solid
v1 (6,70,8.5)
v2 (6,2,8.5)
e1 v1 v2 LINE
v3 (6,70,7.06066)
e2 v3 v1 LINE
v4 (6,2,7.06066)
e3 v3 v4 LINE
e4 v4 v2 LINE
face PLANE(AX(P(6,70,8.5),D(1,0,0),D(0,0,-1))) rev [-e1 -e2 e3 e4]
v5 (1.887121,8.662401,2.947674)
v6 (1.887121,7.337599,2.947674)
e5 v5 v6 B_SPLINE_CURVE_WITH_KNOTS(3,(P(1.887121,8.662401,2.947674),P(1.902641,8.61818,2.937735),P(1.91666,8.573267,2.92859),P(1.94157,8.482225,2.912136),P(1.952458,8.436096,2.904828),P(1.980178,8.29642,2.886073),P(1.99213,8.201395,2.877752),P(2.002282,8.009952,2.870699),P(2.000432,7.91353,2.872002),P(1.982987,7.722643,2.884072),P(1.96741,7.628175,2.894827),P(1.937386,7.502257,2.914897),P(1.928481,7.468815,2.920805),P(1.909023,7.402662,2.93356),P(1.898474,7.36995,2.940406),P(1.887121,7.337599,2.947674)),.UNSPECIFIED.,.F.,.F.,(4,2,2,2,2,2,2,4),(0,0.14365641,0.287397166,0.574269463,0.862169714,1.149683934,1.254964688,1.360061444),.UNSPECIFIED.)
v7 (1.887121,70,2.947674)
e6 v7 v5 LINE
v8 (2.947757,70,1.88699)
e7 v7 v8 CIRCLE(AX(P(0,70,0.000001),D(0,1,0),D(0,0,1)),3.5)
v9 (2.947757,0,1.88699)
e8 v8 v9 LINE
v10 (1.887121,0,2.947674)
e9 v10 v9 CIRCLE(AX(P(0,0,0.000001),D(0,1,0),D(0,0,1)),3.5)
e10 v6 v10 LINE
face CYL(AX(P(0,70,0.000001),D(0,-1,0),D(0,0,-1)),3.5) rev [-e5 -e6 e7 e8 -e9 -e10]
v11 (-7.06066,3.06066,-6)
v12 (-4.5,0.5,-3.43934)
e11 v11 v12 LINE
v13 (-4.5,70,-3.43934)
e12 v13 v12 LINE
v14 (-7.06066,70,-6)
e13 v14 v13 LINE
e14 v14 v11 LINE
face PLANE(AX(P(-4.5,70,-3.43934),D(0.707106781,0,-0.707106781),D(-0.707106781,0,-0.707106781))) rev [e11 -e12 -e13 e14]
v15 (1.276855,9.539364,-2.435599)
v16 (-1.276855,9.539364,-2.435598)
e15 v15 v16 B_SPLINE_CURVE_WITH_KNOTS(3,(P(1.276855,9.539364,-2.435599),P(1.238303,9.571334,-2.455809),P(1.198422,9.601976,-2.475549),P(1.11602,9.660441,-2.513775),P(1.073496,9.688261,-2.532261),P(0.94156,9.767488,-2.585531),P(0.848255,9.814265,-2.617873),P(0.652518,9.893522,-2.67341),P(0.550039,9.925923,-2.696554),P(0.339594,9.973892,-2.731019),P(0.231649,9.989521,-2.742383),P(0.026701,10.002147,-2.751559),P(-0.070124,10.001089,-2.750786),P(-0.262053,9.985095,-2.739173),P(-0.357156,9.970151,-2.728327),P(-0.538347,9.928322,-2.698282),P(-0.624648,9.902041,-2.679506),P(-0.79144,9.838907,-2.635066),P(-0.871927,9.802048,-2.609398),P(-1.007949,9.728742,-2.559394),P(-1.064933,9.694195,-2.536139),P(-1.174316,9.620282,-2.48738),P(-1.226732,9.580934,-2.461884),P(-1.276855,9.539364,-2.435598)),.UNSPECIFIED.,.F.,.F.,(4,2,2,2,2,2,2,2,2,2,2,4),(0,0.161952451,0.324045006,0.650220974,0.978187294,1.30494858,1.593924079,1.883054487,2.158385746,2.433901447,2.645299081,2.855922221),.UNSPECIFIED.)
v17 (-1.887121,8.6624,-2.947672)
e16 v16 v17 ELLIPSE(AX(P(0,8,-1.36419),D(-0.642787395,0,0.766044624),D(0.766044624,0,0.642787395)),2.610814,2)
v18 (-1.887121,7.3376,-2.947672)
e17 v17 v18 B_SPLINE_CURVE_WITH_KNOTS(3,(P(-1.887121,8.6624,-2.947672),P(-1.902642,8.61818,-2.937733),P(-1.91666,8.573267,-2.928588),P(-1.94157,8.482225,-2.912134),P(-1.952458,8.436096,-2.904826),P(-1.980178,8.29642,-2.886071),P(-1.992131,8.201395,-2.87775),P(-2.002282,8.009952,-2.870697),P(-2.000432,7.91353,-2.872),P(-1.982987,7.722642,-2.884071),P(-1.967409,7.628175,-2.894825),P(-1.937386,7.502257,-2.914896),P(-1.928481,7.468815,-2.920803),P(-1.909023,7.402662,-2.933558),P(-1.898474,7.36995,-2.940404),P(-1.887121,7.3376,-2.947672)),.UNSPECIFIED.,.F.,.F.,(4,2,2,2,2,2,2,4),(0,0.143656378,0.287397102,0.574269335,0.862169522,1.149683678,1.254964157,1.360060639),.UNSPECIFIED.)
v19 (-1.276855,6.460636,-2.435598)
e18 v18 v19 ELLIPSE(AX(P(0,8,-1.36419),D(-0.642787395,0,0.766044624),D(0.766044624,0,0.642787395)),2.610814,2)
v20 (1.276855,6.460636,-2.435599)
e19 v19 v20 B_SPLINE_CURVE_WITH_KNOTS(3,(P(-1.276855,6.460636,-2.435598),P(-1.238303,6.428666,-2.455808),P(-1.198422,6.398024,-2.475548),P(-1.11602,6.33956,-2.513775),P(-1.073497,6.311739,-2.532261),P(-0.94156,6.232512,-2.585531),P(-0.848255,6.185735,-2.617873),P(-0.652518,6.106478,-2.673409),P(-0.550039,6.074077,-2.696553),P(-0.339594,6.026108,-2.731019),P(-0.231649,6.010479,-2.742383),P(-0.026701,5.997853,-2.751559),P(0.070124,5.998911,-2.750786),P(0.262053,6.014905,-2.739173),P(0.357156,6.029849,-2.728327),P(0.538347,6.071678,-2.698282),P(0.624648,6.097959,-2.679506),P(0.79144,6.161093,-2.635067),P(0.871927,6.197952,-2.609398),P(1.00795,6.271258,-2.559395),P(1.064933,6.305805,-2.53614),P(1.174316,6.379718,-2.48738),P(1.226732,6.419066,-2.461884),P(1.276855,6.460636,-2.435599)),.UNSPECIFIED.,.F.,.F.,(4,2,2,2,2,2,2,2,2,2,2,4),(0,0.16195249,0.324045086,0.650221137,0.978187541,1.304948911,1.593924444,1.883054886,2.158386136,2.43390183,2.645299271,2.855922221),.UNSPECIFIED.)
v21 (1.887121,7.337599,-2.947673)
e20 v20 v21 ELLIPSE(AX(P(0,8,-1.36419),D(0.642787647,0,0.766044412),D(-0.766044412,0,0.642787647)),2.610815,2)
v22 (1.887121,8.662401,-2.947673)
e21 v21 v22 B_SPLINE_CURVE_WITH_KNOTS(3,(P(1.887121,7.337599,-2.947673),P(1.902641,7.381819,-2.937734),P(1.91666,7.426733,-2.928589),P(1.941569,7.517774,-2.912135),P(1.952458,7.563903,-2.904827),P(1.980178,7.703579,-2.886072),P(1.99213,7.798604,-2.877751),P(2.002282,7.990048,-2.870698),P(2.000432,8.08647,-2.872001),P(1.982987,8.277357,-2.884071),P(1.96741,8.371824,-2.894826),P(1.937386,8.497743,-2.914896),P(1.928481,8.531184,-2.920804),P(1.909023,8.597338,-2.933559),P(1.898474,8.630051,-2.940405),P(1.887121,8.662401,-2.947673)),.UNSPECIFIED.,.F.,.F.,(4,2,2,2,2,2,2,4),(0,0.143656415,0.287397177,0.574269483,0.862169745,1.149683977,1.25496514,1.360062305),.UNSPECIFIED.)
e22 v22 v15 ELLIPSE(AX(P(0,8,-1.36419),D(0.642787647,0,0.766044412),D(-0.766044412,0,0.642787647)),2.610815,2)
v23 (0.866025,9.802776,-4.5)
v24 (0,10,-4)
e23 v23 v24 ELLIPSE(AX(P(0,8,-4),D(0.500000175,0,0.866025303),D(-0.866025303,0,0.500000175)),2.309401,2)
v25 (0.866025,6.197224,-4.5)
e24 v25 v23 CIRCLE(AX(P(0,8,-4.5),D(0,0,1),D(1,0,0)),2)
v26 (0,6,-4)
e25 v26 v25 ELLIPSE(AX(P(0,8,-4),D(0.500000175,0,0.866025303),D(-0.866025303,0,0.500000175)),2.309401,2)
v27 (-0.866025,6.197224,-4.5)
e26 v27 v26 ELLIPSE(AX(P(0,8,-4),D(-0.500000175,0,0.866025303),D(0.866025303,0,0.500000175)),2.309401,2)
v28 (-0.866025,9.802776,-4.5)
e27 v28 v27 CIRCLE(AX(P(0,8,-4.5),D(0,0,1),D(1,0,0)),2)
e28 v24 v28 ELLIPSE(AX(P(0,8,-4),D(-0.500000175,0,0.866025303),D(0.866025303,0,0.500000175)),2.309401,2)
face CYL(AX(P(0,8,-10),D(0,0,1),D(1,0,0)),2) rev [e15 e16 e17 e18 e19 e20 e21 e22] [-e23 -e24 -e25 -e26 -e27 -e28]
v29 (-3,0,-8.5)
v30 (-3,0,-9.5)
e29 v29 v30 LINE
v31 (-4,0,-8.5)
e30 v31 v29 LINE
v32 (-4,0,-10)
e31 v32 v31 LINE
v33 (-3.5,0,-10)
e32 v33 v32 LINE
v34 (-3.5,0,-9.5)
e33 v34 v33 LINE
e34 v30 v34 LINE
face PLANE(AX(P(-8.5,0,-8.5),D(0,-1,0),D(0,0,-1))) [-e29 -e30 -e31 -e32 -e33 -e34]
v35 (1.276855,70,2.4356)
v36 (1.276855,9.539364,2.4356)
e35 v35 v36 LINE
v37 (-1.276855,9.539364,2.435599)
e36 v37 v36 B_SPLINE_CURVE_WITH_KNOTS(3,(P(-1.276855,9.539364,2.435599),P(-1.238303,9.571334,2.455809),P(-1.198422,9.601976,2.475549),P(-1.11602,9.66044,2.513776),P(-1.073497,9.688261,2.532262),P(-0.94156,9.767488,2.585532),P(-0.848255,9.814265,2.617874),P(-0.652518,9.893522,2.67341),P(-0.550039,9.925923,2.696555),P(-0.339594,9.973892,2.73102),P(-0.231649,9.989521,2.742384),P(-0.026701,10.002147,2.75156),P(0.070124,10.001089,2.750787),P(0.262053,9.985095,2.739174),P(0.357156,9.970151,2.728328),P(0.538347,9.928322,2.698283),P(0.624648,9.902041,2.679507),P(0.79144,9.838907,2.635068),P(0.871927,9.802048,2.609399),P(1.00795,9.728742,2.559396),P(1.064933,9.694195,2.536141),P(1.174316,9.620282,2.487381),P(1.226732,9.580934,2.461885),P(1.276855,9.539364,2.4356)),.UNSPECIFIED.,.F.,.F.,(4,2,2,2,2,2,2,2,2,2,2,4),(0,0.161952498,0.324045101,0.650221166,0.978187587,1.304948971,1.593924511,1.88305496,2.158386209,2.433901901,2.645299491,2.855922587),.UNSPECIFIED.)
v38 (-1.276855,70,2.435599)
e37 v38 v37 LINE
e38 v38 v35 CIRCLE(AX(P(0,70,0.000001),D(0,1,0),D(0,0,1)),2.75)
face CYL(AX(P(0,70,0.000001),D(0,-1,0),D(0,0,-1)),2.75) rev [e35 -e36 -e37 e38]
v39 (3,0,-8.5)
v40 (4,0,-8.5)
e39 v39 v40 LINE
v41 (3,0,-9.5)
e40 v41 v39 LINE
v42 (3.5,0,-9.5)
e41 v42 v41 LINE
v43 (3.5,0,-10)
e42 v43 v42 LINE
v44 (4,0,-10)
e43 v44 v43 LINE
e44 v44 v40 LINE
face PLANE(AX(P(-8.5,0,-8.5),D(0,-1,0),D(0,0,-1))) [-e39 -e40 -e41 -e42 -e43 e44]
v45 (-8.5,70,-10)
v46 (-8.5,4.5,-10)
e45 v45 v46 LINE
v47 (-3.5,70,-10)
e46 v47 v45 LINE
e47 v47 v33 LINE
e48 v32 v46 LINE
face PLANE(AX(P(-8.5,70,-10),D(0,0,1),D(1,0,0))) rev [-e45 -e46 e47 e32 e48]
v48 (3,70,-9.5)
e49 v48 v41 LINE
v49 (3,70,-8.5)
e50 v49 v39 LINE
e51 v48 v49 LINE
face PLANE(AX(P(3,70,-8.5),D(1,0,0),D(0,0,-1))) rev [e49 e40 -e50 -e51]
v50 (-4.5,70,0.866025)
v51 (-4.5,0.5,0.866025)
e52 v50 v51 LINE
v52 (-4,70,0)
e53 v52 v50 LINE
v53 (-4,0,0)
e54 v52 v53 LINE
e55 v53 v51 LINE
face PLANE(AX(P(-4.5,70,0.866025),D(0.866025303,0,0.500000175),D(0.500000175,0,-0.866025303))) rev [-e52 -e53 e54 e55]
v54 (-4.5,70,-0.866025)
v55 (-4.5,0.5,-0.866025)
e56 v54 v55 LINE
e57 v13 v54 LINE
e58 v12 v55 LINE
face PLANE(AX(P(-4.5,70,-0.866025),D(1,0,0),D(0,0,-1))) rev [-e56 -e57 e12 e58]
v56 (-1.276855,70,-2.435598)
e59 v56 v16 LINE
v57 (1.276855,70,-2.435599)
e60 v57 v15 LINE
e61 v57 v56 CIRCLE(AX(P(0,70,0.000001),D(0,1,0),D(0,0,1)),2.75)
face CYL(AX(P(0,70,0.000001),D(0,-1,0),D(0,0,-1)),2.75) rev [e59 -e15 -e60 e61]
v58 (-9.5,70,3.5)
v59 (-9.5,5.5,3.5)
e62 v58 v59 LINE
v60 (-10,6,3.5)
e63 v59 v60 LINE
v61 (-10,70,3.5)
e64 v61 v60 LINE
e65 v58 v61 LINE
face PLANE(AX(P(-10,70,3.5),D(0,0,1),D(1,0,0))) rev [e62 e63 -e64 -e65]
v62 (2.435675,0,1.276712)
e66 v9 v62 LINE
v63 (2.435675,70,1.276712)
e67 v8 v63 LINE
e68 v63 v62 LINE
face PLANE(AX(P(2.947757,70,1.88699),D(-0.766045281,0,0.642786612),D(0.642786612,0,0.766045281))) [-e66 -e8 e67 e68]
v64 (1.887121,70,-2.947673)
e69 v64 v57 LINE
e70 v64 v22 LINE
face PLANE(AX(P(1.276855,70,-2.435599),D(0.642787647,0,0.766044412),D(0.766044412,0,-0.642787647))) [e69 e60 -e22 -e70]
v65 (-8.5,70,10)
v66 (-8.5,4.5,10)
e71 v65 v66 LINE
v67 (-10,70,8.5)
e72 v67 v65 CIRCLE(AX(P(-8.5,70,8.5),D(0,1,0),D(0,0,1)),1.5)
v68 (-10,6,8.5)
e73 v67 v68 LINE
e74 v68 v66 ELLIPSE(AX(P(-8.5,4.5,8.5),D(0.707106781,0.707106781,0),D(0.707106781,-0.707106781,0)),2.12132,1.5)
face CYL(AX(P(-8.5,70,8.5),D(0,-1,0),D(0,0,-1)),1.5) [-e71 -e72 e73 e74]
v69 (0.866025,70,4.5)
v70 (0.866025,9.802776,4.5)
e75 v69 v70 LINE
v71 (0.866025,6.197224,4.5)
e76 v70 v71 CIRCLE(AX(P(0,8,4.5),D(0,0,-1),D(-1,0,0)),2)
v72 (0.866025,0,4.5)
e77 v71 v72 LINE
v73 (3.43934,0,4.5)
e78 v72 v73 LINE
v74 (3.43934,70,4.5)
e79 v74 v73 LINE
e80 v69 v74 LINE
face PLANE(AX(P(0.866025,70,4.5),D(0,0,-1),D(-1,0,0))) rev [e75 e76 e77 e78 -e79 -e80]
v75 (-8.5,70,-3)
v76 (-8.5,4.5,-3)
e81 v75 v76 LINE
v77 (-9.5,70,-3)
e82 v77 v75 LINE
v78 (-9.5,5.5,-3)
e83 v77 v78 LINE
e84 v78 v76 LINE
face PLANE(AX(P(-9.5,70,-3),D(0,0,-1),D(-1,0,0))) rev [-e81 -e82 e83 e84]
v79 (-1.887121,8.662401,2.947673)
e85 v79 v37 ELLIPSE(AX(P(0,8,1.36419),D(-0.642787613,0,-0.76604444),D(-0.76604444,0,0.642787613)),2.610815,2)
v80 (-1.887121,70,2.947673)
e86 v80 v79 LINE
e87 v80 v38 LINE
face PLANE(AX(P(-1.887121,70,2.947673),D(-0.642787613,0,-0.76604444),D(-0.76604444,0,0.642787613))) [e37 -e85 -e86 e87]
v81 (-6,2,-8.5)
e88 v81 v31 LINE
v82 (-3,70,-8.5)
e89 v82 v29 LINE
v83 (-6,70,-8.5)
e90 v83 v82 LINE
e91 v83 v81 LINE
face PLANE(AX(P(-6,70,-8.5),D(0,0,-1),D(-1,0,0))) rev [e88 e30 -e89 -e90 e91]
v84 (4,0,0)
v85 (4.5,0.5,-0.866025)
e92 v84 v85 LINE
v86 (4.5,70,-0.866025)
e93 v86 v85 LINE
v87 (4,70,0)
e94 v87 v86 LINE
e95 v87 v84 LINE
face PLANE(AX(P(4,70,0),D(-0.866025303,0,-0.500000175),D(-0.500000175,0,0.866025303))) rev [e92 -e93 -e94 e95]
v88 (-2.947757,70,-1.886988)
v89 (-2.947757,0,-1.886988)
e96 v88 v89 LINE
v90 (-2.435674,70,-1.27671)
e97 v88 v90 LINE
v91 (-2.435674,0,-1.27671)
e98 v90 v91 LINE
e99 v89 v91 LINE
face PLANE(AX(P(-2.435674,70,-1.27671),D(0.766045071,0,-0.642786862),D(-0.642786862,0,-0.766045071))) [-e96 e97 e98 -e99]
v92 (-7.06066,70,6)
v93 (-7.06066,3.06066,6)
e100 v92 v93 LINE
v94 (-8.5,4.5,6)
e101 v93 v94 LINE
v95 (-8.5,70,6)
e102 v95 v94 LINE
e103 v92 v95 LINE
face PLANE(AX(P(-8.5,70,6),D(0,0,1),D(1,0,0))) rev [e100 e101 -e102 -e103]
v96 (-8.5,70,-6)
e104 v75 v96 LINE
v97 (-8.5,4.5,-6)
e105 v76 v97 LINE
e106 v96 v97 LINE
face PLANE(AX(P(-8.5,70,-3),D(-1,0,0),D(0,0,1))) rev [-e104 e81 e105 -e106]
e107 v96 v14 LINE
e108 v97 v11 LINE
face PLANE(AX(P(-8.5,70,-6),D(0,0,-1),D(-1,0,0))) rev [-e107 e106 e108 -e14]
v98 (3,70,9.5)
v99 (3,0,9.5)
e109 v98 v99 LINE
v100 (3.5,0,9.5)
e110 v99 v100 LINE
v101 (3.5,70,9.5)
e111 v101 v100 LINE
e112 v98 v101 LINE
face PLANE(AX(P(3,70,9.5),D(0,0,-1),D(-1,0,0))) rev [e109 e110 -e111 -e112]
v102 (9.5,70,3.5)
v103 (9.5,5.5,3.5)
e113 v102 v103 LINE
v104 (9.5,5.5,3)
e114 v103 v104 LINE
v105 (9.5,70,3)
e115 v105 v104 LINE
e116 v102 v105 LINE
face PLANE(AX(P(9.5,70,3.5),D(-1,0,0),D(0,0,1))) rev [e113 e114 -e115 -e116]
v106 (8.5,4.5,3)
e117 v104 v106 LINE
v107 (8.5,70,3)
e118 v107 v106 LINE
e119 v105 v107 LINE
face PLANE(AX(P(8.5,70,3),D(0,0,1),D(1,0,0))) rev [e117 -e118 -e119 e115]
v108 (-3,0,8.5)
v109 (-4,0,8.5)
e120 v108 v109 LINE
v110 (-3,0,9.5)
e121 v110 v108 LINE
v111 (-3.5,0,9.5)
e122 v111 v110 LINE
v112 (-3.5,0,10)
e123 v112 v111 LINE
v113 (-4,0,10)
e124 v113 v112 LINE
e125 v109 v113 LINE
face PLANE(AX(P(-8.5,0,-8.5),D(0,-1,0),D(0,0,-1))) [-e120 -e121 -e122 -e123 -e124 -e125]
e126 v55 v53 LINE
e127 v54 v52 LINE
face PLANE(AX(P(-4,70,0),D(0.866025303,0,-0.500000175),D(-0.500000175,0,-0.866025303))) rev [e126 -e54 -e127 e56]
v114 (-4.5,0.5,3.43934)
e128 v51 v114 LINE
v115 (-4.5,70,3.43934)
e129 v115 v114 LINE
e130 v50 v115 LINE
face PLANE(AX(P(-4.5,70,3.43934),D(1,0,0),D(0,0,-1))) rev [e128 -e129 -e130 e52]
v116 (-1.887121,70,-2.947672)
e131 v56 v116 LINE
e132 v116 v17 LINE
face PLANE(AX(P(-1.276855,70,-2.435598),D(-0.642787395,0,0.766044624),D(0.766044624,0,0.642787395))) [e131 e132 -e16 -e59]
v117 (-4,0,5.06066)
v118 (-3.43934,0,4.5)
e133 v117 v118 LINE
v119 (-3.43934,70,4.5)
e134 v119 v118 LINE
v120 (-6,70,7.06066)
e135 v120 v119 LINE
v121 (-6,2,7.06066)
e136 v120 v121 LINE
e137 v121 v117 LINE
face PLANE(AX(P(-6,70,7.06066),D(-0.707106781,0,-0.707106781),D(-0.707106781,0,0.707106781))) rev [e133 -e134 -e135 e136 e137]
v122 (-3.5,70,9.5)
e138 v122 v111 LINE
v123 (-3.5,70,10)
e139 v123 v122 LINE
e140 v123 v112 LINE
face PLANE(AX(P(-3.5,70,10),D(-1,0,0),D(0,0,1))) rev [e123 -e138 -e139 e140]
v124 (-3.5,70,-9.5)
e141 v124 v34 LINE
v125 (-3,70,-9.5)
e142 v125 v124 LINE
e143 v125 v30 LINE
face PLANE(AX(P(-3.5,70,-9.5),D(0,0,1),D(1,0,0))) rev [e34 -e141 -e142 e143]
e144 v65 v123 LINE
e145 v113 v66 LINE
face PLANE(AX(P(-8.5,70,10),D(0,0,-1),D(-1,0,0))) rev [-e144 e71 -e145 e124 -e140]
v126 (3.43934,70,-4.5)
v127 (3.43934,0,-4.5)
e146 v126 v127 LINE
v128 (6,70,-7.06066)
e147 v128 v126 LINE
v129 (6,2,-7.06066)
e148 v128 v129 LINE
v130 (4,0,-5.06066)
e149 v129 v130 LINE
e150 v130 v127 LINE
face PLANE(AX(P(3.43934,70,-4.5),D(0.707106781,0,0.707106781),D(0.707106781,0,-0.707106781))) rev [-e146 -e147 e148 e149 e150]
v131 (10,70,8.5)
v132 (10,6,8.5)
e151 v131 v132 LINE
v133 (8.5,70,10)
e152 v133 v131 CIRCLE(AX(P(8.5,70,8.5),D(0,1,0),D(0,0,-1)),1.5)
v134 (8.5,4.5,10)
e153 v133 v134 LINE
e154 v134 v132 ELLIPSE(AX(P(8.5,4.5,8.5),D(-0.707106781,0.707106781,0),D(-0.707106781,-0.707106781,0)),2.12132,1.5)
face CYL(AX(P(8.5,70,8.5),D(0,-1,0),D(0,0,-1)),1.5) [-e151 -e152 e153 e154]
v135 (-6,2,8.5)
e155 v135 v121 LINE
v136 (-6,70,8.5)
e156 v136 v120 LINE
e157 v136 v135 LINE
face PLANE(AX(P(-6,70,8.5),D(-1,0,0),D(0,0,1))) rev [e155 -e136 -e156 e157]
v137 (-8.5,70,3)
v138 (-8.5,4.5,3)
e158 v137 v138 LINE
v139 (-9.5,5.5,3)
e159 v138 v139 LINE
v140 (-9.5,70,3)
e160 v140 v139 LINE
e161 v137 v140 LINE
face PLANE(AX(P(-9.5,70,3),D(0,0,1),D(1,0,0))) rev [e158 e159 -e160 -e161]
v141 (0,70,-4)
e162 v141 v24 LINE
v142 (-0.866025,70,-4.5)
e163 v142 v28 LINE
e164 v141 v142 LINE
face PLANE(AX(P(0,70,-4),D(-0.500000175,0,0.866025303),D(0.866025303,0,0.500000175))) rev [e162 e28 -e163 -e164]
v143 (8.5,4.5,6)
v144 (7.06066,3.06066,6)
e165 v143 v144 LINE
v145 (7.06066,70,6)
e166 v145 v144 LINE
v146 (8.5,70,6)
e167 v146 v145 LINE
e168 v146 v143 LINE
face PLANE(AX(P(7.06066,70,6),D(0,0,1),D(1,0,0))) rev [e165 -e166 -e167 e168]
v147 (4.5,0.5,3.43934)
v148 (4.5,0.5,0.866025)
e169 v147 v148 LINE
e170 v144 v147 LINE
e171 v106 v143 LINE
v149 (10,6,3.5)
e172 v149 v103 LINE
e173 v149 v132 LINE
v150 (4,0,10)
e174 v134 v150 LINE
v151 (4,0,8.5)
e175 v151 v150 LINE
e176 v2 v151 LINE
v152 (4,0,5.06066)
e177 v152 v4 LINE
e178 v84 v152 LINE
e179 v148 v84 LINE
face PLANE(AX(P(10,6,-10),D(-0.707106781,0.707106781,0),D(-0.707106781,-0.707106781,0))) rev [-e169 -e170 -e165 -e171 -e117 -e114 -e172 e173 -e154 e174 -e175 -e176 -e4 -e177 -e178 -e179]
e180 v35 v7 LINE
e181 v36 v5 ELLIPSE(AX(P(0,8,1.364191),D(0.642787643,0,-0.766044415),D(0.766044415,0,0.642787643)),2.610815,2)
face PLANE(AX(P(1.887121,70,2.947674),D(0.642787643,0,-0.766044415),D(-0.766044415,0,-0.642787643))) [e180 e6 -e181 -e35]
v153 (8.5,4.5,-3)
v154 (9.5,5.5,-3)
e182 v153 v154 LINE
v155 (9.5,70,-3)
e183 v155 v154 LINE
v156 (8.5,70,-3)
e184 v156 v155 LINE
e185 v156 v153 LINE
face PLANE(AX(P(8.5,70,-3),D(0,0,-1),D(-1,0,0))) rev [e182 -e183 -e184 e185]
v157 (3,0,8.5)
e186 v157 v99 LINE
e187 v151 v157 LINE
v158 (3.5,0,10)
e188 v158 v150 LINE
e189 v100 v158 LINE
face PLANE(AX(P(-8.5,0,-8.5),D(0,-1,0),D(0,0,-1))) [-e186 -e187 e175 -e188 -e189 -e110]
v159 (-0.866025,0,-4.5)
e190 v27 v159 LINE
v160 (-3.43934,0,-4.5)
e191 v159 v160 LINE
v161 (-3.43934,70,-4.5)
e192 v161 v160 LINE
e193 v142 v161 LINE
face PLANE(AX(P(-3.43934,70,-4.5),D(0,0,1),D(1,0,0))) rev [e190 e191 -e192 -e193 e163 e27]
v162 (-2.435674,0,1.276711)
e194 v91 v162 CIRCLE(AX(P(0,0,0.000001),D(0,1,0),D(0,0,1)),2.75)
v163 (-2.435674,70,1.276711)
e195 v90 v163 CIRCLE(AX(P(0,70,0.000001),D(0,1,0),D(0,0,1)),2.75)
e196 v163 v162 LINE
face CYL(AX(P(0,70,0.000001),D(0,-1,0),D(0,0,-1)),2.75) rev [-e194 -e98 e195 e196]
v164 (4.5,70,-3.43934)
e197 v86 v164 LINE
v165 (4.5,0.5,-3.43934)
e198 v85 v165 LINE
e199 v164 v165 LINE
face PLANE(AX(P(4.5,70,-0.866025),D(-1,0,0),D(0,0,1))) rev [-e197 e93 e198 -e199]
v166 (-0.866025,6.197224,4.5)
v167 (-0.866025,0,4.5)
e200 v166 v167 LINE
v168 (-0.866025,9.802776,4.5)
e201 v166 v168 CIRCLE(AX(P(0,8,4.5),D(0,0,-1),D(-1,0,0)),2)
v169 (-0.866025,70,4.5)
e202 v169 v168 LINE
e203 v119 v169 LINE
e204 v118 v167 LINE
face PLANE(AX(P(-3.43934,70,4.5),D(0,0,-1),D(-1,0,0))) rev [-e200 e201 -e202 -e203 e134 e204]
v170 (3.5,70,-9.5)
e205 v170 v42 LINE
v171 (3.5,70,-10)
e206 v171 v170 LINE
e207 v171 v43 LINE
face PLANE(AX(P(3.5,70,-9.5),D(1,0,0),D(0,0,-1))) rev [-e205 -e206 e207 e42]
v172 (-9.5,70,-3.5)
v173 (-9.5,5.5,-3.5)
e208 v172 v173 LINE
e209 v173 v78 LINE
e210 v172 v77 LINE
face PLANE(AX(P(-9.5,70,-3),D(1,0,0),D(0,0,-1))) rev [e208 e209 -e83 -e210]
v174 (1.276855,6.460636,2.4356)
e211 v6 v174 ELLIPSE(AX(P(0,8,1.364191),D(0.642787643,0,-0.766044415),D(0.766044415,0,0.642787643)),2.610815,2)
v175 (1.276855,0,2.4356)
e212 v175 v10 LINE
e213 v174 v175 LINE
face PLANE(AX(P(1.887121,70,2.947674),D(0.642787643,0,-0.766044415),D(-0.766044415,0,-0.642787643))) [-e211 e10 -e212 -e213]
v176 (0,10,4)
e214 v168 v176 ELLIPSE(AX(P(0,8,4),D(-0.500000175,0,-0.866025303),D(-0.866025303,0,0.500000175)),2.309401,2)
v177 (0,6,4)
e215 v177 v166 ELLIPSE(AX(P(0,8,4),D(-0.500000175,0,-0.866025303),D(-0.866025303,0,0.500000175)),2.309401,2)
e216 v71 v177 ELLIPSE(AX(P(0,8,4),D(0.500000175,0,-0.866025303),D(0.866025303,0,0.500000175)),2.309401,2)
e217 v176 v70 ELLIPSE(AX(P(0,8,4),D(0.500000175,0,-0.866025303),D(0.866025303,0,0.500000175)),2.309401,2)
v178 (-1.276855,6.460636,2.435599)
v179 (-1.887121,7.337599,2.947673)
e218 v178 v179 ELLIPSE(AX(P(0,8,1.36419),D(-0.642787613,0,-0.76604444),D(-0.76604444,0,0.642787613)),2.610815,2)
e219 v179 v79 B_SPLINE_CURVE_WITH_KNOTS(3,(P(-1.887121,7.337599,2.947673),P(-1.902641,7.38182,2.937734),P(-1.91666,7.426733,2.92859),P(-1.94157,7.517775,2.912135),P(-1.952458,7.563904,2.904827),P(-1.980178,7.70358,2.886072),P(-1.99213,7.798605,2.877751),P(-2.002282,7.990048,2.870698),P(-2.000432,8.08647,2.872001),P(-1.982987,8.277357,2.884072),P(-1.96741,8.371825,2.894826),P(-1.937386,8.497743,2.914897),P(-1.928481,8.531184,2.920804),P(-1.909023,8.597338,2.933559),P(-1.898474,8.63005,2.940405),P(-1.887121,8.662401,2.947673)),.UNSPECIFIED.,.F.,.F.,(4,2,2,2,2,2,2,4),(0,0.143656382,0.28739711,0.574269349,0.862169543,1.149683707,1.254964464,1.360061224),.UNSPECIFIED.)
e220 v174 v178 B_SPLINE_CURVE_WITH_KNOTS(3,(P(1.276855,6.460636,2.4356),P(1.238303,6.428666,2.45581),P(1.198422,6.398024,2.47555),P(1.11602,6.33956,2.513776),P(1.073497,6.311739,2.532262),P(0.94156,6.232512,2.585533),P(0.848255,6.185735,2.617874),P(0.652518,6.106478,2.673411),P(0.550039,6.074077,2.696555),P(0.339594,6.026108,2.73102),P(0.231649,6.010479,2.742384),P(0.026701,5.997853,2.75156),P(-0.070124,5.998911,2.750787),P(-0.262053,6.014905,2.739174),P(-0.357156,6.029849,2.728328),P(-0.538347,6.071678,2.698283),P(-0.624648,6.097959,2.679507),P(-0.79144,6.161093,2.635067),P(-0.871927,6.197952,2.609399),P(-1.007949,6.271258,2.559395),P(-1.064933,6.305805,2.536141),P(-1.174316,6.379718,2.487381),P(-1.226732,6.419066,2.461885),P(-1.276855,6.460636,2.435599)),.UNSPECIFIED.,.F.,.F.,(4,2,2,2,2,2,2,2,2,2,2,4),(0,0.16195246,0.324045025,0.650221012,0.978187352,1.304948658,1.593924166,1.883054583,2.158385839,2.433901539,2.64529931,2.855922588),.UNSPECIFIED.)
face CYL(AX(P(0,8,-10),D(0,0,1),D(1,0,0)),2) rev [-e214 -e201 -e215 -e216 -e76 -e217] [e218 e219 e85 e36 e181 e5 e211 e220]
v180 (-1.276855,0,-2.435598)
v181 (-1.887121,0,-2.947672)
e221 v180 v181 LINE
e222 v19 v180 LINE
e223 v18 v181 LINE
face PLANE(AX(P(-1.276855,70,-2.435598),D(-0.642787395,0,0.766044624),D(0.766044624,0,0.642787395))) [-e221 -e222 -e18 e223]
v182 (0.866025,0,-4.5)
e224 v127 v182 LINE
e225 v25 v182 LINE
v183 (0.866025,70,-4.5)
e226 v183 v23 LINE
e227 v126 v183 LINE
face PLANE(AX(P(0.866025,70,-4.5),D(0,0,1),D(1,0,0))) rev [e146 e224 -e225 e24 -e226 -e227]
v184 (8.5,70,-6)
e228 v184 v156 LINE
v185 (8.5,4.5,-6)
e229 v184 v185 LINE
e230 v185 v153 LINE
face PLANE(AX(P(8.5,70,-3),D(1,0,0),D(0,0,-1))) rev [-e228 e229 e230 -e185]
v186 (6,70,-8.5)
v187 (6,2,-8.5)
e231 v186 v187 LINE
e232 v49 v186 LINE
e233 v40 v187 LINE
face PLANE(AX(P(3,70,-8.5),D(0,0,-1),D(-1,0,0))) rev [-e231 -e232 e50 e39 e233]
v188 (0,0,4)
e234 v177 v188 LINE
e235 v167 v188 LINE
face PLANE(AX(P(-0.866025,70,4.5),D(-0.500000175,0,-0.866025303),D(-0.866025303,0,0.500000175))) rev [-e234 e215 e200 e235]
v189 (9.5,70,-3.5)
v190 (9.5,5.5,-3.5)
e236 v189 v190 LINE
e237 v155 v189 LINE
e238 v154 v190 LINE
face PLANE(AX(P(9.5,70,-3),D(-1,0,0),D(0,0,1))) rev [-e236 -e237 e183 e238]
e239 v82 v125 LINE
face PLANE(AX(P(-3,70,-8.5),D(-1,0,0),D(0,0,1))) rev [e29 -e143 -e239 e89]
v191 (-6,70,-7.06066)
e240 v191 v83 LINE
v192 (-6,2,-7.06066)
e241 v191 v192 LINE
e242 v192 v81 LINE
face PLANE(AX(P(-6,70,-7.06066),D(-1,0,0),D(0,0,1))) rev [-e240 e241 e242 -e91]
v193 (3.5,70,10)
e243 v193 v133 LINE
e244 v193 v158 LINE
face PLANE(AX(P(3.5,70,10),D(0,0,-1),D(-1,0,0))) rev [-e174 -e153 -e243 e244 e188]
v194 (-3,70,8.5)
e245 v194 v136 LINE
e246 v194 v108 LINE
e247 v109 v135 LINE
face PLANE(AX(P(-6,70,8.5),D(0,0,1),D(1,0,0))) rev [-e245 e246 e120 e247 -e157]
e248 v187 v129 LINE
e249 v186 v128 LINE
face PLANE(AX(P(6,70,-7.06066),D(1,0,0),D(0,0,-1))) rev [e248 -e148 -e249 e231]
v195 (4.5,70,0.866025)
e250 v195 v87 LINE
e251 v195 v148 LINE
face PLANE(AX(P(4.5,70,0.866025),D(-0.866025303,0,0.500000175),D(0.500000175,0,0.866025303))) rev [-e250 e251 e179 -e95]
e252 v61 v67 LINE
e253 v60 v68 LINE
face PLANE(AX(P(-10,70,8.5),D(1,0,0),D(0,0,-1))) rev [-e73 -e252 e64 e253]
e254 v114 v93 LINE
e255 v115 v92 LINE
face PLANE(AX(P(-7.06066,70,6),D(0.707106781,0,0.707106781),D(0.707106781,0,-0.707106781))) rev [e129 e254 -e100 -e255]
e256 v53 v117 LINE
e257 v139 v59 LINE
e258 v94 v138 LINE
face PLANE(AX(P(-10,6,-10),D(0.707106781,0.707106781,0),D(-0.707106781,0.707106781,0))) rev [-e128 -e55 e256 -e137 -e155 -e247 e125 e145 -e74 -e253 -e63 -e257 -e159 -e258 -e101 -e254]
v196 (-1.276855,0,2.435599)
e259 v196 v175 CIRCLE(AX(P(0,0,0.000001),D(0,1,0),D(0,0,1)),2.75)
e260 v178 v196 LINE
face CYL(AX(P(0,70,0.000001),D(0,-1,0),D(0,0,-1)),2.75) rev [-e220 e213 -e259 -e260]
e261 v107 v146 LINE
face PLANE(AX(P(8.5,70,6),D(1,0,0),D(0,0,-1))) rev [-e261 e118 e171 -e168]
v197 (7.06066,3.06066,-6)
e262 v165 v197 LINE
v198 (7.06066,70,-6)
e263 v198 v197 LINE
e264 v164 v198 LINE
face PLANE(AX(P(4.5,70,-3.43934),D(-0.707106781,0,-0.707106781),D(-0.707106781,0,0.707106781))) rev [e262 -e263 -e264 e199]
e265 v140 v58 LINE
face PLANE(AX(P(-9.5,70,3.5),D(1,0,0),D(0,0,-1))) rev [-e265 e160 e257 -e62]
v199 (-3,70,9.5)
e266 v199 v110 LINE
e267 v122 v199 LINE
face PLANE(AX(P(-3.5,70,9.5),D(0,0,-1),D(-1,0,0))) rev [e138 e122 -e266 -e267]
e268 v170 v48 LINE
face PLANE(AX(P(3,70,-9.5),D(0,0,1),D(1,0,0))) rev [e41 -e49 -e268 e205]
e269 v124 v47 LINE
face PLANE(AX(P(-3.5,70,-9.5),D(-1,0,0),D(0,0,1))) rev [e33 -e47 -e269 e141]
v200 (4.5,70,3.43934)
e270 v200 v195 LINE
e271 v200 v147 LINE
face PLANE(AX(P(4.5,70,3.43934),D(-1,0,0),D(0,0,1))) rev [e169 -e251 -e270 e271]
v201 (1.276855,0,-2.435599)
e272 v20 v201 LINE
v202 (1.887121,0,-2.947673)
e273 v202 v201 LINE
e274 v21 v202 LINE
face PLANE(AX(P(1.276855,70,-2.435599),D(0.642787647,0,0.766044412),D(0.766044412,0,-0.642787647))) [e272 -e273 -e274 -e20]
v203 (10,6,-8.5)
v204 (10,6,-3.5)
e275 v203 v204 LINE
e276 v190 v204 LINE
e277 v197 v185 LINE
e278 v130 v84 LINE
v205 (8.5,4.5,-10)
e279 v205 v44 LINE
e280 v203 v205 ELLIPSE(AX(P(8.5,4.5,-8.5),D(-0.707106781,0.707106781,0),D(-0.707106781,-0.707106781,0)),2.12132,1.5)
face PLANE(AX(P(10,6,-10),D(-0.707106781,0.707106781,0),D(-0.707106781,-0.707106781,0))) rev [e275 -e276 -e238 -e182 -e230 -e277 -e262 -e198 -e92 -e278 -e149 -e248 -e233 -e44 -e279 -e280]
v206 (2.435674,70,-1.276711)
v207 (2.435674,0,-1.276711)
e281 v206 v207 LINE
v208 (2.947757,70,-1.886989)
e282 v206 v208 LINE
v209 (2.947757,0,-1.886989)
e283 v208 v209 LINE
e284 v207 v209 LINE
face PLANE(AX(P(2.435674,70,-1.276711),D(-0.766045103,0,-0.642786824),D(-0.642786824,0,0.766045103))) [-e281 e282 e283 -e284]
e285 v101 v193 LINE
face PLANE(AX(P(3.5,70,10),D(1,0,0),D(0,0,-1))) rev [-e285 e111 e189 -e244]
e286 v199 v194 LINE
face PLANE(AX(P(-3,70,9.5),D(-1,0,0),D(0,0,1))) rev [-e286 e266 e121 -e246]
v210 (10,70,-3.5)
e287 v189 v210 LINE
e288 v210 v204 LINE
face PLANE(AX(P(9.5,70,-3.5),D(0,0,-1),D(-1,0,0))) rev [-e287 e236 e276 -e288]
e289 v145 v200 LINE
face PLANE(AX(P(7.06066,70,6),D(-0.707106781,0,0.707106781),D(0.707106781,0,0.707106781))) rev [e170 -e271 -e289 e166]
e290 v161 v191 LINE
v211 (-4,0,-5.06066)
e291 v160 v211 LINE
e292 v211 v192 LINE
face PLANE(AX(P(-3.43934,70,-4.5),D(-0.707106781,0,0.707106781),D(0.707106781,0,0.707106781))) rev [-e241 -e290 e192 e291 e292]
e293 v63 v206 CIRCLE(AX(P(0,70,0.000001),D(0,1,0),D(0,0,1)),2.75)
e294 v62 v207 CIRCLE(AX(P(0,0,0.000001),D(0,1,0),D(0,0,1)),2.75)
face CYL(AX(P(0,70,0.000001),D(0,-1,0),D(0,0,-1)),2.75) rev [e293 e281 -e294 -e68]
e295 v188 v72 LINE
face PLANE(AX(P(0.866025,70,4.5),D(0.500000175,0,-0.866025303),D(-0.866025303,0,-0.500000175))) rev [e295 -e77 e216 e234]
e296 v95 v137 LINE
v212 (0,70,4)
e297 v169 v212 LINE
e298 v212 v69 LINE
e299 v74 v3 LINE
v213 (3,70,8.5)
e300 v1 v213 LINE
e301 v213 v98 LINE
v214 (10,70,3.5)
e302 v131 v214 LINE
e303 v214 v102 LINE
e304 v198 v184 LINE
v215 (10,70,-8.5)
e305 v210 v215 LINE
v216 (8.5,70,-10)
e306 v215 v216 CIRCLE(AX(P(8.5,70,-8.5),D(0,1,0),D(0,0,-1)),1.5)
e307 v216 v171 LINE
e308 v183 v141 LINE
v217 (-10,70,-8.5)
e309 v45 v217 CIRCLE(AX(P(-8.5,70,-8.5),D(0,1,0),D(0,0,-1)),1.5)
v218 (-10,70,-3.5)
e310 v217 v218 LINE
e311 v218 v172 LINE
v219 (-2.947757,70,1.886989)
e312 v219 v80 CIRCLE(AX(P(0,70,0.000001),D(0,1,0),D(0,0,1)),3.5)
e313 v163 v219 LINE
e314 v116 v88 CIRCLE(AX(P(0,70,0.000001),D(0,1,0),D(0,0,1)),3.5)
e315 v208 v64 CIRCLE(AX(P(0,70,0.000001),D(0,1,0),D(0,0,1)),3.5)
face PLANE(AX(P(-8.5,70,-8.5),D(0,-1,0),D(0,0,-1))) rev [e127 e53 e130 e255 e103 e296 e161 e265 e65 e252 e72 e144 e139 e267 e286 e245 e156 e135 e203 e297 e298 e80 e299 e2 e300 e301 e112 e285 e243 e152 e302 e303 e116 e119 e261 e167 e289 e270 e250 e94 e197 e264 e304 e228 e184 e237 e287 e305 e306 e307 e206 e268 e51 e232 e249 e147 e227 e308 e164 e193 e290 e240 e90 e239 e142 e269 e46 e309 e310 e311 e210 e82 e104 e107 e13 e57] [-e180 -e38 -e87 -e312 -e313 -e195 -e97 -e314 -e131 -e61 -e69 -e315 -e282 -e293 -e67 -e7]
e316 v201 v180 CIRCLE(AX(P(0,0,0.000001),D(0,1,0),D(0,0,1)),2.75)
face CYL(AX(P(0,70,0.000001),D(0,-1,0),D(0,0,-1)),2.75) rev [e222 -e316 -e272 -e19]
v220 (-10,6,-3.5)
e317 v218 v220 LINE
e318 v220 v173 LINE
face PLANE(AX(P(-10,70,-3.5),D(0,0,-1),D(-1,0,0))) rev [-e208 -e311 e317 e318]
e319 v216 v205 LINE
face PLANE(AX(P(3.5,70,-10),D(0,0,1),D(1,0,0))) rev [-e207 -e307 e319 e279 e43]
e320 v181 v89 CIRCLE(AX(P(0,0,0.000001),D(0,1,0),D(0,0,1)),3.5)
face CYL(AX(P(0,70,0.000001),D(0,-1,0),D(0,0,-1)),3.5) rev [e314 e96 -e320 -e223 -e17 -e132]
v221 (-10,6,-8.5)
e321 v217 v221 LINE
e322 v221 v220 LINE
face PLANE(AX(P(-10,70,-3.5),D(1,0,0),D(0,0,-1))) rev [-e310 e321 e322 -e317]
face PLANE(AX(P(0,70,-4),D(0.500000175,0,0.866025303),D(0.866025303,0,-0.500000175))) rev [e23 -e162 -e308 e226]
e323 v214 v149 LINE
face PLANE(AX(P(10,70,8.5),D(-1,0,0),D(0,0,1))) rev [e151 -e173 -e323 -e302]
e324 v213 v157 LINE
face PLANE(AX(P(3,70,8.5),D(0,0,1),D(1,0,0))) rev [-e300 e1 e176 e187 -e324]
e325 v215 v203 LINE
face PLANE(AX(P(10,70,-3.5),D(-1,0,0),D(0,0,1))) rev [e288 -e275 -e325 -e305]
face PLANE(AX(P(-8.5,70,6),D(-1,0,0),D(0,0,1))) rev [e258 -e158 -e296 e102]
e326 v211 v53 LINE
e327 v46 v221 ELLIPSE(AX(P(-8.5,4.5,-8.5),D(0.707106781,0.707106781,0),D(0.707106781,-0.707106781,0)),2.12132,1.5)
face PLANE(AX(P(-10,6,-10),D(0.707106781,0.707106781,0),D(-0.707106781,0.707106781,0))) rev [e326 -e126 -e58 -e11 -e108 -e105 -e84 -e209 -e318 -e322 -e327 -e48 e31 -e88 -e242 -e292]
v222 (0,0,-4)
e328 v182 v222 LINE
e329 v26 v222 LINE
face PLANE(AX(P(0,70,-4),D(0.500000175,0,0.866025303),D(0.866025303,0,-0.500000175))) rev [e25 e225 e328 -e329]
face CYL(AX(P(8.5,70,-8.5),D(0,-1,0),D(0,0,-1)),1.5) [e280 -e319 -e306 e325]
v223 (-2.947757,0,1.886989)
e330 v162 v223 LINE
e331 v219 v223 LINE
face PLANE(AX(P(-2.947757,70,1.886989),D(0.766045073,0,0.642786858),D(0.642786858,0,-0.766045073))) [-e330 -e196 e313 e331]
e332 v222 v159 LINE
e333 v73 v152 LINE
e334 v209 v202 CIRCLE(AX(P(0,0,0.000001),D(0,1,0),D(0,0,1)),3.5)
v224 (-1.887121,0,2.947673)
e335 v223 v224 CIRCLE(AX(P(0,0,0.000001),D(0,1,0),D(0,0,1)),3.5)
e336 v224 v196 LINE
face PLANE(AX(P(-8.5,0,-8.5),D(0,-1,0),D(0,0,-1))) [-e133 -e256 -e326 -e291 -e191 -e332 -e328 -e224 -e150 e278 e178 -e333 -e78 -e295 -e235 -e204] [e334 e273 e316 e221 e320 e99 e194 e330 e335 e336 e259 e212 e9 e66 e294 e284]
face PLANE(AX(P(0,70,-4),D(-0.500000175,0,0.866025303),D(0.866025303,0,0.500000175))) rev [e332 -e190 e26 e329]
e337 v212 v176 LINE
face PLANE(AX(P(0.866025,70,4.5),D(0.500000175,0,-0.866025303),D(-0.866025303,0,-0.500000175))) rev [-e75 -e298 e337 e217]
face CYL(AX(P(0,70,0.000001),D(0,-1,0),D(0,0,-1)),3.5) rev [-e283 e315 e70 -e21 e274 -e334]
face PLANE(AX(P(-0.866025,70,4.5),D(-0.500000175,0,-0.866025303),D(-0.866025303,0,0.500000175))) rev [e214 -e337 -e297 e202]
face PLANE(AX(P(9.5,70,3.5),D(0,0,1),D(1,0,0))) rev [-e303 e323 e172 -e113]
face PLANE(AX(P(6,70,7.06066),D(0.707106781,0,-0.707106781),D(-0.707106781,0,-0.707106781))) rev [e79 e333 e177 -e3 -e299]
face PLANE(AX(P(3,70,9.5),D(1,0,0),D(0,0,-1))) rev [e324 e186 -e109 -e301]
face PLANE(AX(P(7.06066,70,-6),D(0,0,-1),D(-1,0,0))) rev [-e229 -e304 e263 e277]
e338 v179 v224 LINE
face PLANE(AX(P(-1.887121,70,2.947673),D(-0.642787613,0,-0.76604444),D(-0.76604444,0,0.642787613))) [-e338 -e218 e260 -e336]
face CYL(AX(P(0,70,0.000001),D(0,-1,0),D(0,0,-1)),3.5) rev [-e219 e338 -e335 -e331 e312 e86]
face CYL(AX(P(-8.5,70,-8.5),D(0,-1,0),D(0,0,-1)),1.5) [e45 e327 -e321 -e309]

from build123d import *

# Parameters (mm, degrees)
BOSS_EXTRUDE1_DEPTH     = 70
CUT_EXTRUDE1_DEPTH      = 72.414284285
CUT_EXTRUDE1_DEPTH_BACK = 72.414284285
SKETCH3_R               = 2


# Read off the part's stored shape, not the designer's step: Imported1
with BuildPart() as part:
    # Sketch1 → Boss-Extrude1 (new body)
    with BuildSketch(Plane(origin=(0, 0, 0), x_dir=(1, 0, 0), z_dir=(0, 1, 0))):
        with BuildLine():
            Line((4.5, -0.866025), (4, 0))
            Line((4, 0), (4.5, 0.866025))
            Line((4.5, 0.866025), (4.5, 3.43934))
            Line((4.5, 3.43934), (7.06066, 6))
            Line((7.06066, 6), (8.5, 6))
            Line((8.5, 6), (8.5, 3))
            Line((8.5, 3), (9.5, 3))
            Line((9.5, 3), (9.5, 3.5))
            Line((9.5, 3.5), (10, 3.5))
            Line((10, 3.5), (10, 8.5))
            ThreePointArc((10, 8.5), (9.560660172, 9.560660172), (8.5, 10))
            Line((8.5, 10), (3.5, 10))
            Line((3.5, 10), (3.5, 9.5))
            Line((3.5, 9.5), (3, 9.5))
            Line((3, 9.5), (3, 8.5))
            Line((3, 8.5), (6, 8.5))
            Line((6, 8.5), (6, 7.06066))
            Line((6, 7.06066), (3.43934, 4.5))
            Line((3.43934, 4.5), (0.866025, 4.5))
            Line((0.866025, 4.5), (0, 4))
            Line((0, 4), (-0.866025, 4.5))
            Line((-0.866025, 4.5), (-3.43934, 4.5))
            Line((-3.43934, 4.5), (-6, 7.06066))
            Line((-6, 7.06066), (-6, 8.5))
            Line((-6, 8.5), (-3, 8.5))
            Line((-3, 8.5), (-3, 9.5))
            Line((-3, 9.5), (-3.5, 9.5))
            Line((-3.5, 9.5), (-3.5, 10))
            Line((-3.5, 10), (-8.5, 10))
            ThreePointArc((-8.5, 10), (-9.560660172, 9.560660172), (-10, 8.5))
            Line((-10, 8.5), (-10, 3.5))
            Line((-10, 3.5), (-9.5, 3.5))
            Line((-9.5, 3.5), (-9.5, 3))
            Line((-9.5, 3), (-8.5, 3))
            Line((-8.5, 3), (-8.5, 6))
            Line((-8.5, 6), (-7.06066, 6))
            Line((-7.06066, 6), (-4.5, 3.43934))
            Line((-4.5, 3.43934), (-4.5, 0.866025))
            Line((-4.5, 0.866025), (-4, 0))
            Line((-4, 0), (-4.5, -0.866025))
            Line((-4.5, -0.866025), (-4.5, -3.43934))
            Line((-4.5, -3.43934), (-7.06066, -6))
            Line((-7.06066, -6), (-8.5, -6))
            Line((-8.5, -6), (-8.5, -3))
            Line((-8.5, -3), (-9.5, -3))
            Line((-9.5, -3), (-9.5, -3.5))
            Line((-9.5, -3.5), (-10, -3.5))
            Line((-10, -3.5), (-10, -8.5))
            ThreePointArc((-10, -8.5), (-9.560660172, -9.560660172), (-8.5, -10))
            Line((-8.5, -10), (-3.5, -10))
            Line((-3.5, -10), (-3.5, -9.5))
            Line((-3.5, -9.5), (-3, -9.5))
            Line((-3, -9.5), (-3, -8.5))
            Line((-3, -8.5), (-6, -8.5))
            Line((-6, -8.5), (-6, -7.06066))
            Line((-6, -7.06066), (-3.43934, -4.5))
            Line((-3.43934, -4.5), (-0.866025, -4.5))
            Line((-0.866025, -4.5), (0, -4))
            Line((0, -4), (0.866025, -4.5))
            Line((0.866025, -4.5), (3.43934, -4.5))
            Line((3.43934, -4.5), (6, -7.06066))
            Line((6, -7.06066), (6, -8.5))
            Line((6, -8.5), (3, -8.5))
            Line((3, -8.5), (3, -9.5))
            Line((3, -9.5), (3.5, -9.5))
            Line((3.5, -9.5), (3.5, -10))
            Line((3.5, -10), (8.5, -10))
            ThreePointArc((8.5, -10), (9.560660172, -9.560660172), (10, -8.5))
            Line((10, -8.5), (10, -3.5))
            Line((10, -3.5), (9.5, -3.5))
            Line((9.5, -3.5), (9.5, -3))
            Line((9.5, -3), (8.5, -3))
            Line((8.5, -3), (8.5, -6))
            Line((8.5, -6), (7.06066, -6))
            Line((7.06066, -6), (4.5, -3.43934))
            Line((4.5, -3.43934), (4.5, -0.866025))
        make_face()
        with BuildLine():
            Line((2.947757456, -1.8869899), (2.435674593, -1.276711693))
            ThreePointArc((2.435674593, -1.276711693), (2.750000433, -2.31e-07), (2.435674303, 1.276711159))
            Line((2.435674303, 1.276711159), (2.947757255, 1.886989128))
            ThreePointArc((2.947757255, 1.886989128), (2.474929059, 2.474818349), (1.887120795, 2.947672597))
            Line((1.887120795, 2.947672597), (1.276854759, 2.435598541))
            ThreePointArc((1.276854759, 2.435598541), (-1.33e-07, 2.749999412), (-1.276854885, 2.435597973))
            Line((-1.276854885, 2.435597973), (-1.887121068, 2.94767181))
            ThreePointArc((-1.887121068, 2.94767181), (-2.47492916, 2.474817292), (-2.947757123, 1.886987839))
            Line((-2.947757123, 1.886987839), (-2.43567406, 1.276709798))
            ThreePointArc((-2.43567406, 1.276709798), (-2.749999477, -6.08e-07), (-2.435674, -1.276711))
            Line((-2.435674, -1.276711), (-2.947757054, -1.886989034))
            ThreePointArc((-2.947757054, -1.886989034), (-2.474929075, -2.474818464), (-1.887120973, -2.947672958))
            Line((-1.887120973, -2.947672958), (-1.276855, -2.435599))
            ThreePointArc((-1.276855, -2.435599), (-1.15e-07, -2.750000499), (1.276854906, -2.43559955))
            Line((1.276854906, -2.43559955), (1.887120935, -2.947673594))
            ThreePointArc((1.887120935, -2.947673594), (2.47492925, -2.474819245), (2.947757456, -1.8869899))
        make_face(mode=Mode.SUBTRACT)
    extrude(amount=BOSS_EXTRUDE1_DEPTH)

    # Sketch3 → Cut-Extrude1 (cut, two sides: drawn at the far end of the back side and taken through both)
    with BuildSketch(Plane.XY.offset(-CUT_EXTRUDE1_DEPTH_BACK)):
        with Locations(Location((0, 8, 0), (0, 0, 340.658342389))):
            Circle(SKETCH3_R)
        Polygon((-10, 6), (-4, 0), (-10, 0), align=None)
        Polygon((10, 0), (10, 6), (4, 0), align=None)
    extrude(amount=CUT_EXTRUDE1_DEPTH + CUT_EXTRUDE1_DEPTH_BACK, mode=Mode.SUBTRACT)


solid = part.part
